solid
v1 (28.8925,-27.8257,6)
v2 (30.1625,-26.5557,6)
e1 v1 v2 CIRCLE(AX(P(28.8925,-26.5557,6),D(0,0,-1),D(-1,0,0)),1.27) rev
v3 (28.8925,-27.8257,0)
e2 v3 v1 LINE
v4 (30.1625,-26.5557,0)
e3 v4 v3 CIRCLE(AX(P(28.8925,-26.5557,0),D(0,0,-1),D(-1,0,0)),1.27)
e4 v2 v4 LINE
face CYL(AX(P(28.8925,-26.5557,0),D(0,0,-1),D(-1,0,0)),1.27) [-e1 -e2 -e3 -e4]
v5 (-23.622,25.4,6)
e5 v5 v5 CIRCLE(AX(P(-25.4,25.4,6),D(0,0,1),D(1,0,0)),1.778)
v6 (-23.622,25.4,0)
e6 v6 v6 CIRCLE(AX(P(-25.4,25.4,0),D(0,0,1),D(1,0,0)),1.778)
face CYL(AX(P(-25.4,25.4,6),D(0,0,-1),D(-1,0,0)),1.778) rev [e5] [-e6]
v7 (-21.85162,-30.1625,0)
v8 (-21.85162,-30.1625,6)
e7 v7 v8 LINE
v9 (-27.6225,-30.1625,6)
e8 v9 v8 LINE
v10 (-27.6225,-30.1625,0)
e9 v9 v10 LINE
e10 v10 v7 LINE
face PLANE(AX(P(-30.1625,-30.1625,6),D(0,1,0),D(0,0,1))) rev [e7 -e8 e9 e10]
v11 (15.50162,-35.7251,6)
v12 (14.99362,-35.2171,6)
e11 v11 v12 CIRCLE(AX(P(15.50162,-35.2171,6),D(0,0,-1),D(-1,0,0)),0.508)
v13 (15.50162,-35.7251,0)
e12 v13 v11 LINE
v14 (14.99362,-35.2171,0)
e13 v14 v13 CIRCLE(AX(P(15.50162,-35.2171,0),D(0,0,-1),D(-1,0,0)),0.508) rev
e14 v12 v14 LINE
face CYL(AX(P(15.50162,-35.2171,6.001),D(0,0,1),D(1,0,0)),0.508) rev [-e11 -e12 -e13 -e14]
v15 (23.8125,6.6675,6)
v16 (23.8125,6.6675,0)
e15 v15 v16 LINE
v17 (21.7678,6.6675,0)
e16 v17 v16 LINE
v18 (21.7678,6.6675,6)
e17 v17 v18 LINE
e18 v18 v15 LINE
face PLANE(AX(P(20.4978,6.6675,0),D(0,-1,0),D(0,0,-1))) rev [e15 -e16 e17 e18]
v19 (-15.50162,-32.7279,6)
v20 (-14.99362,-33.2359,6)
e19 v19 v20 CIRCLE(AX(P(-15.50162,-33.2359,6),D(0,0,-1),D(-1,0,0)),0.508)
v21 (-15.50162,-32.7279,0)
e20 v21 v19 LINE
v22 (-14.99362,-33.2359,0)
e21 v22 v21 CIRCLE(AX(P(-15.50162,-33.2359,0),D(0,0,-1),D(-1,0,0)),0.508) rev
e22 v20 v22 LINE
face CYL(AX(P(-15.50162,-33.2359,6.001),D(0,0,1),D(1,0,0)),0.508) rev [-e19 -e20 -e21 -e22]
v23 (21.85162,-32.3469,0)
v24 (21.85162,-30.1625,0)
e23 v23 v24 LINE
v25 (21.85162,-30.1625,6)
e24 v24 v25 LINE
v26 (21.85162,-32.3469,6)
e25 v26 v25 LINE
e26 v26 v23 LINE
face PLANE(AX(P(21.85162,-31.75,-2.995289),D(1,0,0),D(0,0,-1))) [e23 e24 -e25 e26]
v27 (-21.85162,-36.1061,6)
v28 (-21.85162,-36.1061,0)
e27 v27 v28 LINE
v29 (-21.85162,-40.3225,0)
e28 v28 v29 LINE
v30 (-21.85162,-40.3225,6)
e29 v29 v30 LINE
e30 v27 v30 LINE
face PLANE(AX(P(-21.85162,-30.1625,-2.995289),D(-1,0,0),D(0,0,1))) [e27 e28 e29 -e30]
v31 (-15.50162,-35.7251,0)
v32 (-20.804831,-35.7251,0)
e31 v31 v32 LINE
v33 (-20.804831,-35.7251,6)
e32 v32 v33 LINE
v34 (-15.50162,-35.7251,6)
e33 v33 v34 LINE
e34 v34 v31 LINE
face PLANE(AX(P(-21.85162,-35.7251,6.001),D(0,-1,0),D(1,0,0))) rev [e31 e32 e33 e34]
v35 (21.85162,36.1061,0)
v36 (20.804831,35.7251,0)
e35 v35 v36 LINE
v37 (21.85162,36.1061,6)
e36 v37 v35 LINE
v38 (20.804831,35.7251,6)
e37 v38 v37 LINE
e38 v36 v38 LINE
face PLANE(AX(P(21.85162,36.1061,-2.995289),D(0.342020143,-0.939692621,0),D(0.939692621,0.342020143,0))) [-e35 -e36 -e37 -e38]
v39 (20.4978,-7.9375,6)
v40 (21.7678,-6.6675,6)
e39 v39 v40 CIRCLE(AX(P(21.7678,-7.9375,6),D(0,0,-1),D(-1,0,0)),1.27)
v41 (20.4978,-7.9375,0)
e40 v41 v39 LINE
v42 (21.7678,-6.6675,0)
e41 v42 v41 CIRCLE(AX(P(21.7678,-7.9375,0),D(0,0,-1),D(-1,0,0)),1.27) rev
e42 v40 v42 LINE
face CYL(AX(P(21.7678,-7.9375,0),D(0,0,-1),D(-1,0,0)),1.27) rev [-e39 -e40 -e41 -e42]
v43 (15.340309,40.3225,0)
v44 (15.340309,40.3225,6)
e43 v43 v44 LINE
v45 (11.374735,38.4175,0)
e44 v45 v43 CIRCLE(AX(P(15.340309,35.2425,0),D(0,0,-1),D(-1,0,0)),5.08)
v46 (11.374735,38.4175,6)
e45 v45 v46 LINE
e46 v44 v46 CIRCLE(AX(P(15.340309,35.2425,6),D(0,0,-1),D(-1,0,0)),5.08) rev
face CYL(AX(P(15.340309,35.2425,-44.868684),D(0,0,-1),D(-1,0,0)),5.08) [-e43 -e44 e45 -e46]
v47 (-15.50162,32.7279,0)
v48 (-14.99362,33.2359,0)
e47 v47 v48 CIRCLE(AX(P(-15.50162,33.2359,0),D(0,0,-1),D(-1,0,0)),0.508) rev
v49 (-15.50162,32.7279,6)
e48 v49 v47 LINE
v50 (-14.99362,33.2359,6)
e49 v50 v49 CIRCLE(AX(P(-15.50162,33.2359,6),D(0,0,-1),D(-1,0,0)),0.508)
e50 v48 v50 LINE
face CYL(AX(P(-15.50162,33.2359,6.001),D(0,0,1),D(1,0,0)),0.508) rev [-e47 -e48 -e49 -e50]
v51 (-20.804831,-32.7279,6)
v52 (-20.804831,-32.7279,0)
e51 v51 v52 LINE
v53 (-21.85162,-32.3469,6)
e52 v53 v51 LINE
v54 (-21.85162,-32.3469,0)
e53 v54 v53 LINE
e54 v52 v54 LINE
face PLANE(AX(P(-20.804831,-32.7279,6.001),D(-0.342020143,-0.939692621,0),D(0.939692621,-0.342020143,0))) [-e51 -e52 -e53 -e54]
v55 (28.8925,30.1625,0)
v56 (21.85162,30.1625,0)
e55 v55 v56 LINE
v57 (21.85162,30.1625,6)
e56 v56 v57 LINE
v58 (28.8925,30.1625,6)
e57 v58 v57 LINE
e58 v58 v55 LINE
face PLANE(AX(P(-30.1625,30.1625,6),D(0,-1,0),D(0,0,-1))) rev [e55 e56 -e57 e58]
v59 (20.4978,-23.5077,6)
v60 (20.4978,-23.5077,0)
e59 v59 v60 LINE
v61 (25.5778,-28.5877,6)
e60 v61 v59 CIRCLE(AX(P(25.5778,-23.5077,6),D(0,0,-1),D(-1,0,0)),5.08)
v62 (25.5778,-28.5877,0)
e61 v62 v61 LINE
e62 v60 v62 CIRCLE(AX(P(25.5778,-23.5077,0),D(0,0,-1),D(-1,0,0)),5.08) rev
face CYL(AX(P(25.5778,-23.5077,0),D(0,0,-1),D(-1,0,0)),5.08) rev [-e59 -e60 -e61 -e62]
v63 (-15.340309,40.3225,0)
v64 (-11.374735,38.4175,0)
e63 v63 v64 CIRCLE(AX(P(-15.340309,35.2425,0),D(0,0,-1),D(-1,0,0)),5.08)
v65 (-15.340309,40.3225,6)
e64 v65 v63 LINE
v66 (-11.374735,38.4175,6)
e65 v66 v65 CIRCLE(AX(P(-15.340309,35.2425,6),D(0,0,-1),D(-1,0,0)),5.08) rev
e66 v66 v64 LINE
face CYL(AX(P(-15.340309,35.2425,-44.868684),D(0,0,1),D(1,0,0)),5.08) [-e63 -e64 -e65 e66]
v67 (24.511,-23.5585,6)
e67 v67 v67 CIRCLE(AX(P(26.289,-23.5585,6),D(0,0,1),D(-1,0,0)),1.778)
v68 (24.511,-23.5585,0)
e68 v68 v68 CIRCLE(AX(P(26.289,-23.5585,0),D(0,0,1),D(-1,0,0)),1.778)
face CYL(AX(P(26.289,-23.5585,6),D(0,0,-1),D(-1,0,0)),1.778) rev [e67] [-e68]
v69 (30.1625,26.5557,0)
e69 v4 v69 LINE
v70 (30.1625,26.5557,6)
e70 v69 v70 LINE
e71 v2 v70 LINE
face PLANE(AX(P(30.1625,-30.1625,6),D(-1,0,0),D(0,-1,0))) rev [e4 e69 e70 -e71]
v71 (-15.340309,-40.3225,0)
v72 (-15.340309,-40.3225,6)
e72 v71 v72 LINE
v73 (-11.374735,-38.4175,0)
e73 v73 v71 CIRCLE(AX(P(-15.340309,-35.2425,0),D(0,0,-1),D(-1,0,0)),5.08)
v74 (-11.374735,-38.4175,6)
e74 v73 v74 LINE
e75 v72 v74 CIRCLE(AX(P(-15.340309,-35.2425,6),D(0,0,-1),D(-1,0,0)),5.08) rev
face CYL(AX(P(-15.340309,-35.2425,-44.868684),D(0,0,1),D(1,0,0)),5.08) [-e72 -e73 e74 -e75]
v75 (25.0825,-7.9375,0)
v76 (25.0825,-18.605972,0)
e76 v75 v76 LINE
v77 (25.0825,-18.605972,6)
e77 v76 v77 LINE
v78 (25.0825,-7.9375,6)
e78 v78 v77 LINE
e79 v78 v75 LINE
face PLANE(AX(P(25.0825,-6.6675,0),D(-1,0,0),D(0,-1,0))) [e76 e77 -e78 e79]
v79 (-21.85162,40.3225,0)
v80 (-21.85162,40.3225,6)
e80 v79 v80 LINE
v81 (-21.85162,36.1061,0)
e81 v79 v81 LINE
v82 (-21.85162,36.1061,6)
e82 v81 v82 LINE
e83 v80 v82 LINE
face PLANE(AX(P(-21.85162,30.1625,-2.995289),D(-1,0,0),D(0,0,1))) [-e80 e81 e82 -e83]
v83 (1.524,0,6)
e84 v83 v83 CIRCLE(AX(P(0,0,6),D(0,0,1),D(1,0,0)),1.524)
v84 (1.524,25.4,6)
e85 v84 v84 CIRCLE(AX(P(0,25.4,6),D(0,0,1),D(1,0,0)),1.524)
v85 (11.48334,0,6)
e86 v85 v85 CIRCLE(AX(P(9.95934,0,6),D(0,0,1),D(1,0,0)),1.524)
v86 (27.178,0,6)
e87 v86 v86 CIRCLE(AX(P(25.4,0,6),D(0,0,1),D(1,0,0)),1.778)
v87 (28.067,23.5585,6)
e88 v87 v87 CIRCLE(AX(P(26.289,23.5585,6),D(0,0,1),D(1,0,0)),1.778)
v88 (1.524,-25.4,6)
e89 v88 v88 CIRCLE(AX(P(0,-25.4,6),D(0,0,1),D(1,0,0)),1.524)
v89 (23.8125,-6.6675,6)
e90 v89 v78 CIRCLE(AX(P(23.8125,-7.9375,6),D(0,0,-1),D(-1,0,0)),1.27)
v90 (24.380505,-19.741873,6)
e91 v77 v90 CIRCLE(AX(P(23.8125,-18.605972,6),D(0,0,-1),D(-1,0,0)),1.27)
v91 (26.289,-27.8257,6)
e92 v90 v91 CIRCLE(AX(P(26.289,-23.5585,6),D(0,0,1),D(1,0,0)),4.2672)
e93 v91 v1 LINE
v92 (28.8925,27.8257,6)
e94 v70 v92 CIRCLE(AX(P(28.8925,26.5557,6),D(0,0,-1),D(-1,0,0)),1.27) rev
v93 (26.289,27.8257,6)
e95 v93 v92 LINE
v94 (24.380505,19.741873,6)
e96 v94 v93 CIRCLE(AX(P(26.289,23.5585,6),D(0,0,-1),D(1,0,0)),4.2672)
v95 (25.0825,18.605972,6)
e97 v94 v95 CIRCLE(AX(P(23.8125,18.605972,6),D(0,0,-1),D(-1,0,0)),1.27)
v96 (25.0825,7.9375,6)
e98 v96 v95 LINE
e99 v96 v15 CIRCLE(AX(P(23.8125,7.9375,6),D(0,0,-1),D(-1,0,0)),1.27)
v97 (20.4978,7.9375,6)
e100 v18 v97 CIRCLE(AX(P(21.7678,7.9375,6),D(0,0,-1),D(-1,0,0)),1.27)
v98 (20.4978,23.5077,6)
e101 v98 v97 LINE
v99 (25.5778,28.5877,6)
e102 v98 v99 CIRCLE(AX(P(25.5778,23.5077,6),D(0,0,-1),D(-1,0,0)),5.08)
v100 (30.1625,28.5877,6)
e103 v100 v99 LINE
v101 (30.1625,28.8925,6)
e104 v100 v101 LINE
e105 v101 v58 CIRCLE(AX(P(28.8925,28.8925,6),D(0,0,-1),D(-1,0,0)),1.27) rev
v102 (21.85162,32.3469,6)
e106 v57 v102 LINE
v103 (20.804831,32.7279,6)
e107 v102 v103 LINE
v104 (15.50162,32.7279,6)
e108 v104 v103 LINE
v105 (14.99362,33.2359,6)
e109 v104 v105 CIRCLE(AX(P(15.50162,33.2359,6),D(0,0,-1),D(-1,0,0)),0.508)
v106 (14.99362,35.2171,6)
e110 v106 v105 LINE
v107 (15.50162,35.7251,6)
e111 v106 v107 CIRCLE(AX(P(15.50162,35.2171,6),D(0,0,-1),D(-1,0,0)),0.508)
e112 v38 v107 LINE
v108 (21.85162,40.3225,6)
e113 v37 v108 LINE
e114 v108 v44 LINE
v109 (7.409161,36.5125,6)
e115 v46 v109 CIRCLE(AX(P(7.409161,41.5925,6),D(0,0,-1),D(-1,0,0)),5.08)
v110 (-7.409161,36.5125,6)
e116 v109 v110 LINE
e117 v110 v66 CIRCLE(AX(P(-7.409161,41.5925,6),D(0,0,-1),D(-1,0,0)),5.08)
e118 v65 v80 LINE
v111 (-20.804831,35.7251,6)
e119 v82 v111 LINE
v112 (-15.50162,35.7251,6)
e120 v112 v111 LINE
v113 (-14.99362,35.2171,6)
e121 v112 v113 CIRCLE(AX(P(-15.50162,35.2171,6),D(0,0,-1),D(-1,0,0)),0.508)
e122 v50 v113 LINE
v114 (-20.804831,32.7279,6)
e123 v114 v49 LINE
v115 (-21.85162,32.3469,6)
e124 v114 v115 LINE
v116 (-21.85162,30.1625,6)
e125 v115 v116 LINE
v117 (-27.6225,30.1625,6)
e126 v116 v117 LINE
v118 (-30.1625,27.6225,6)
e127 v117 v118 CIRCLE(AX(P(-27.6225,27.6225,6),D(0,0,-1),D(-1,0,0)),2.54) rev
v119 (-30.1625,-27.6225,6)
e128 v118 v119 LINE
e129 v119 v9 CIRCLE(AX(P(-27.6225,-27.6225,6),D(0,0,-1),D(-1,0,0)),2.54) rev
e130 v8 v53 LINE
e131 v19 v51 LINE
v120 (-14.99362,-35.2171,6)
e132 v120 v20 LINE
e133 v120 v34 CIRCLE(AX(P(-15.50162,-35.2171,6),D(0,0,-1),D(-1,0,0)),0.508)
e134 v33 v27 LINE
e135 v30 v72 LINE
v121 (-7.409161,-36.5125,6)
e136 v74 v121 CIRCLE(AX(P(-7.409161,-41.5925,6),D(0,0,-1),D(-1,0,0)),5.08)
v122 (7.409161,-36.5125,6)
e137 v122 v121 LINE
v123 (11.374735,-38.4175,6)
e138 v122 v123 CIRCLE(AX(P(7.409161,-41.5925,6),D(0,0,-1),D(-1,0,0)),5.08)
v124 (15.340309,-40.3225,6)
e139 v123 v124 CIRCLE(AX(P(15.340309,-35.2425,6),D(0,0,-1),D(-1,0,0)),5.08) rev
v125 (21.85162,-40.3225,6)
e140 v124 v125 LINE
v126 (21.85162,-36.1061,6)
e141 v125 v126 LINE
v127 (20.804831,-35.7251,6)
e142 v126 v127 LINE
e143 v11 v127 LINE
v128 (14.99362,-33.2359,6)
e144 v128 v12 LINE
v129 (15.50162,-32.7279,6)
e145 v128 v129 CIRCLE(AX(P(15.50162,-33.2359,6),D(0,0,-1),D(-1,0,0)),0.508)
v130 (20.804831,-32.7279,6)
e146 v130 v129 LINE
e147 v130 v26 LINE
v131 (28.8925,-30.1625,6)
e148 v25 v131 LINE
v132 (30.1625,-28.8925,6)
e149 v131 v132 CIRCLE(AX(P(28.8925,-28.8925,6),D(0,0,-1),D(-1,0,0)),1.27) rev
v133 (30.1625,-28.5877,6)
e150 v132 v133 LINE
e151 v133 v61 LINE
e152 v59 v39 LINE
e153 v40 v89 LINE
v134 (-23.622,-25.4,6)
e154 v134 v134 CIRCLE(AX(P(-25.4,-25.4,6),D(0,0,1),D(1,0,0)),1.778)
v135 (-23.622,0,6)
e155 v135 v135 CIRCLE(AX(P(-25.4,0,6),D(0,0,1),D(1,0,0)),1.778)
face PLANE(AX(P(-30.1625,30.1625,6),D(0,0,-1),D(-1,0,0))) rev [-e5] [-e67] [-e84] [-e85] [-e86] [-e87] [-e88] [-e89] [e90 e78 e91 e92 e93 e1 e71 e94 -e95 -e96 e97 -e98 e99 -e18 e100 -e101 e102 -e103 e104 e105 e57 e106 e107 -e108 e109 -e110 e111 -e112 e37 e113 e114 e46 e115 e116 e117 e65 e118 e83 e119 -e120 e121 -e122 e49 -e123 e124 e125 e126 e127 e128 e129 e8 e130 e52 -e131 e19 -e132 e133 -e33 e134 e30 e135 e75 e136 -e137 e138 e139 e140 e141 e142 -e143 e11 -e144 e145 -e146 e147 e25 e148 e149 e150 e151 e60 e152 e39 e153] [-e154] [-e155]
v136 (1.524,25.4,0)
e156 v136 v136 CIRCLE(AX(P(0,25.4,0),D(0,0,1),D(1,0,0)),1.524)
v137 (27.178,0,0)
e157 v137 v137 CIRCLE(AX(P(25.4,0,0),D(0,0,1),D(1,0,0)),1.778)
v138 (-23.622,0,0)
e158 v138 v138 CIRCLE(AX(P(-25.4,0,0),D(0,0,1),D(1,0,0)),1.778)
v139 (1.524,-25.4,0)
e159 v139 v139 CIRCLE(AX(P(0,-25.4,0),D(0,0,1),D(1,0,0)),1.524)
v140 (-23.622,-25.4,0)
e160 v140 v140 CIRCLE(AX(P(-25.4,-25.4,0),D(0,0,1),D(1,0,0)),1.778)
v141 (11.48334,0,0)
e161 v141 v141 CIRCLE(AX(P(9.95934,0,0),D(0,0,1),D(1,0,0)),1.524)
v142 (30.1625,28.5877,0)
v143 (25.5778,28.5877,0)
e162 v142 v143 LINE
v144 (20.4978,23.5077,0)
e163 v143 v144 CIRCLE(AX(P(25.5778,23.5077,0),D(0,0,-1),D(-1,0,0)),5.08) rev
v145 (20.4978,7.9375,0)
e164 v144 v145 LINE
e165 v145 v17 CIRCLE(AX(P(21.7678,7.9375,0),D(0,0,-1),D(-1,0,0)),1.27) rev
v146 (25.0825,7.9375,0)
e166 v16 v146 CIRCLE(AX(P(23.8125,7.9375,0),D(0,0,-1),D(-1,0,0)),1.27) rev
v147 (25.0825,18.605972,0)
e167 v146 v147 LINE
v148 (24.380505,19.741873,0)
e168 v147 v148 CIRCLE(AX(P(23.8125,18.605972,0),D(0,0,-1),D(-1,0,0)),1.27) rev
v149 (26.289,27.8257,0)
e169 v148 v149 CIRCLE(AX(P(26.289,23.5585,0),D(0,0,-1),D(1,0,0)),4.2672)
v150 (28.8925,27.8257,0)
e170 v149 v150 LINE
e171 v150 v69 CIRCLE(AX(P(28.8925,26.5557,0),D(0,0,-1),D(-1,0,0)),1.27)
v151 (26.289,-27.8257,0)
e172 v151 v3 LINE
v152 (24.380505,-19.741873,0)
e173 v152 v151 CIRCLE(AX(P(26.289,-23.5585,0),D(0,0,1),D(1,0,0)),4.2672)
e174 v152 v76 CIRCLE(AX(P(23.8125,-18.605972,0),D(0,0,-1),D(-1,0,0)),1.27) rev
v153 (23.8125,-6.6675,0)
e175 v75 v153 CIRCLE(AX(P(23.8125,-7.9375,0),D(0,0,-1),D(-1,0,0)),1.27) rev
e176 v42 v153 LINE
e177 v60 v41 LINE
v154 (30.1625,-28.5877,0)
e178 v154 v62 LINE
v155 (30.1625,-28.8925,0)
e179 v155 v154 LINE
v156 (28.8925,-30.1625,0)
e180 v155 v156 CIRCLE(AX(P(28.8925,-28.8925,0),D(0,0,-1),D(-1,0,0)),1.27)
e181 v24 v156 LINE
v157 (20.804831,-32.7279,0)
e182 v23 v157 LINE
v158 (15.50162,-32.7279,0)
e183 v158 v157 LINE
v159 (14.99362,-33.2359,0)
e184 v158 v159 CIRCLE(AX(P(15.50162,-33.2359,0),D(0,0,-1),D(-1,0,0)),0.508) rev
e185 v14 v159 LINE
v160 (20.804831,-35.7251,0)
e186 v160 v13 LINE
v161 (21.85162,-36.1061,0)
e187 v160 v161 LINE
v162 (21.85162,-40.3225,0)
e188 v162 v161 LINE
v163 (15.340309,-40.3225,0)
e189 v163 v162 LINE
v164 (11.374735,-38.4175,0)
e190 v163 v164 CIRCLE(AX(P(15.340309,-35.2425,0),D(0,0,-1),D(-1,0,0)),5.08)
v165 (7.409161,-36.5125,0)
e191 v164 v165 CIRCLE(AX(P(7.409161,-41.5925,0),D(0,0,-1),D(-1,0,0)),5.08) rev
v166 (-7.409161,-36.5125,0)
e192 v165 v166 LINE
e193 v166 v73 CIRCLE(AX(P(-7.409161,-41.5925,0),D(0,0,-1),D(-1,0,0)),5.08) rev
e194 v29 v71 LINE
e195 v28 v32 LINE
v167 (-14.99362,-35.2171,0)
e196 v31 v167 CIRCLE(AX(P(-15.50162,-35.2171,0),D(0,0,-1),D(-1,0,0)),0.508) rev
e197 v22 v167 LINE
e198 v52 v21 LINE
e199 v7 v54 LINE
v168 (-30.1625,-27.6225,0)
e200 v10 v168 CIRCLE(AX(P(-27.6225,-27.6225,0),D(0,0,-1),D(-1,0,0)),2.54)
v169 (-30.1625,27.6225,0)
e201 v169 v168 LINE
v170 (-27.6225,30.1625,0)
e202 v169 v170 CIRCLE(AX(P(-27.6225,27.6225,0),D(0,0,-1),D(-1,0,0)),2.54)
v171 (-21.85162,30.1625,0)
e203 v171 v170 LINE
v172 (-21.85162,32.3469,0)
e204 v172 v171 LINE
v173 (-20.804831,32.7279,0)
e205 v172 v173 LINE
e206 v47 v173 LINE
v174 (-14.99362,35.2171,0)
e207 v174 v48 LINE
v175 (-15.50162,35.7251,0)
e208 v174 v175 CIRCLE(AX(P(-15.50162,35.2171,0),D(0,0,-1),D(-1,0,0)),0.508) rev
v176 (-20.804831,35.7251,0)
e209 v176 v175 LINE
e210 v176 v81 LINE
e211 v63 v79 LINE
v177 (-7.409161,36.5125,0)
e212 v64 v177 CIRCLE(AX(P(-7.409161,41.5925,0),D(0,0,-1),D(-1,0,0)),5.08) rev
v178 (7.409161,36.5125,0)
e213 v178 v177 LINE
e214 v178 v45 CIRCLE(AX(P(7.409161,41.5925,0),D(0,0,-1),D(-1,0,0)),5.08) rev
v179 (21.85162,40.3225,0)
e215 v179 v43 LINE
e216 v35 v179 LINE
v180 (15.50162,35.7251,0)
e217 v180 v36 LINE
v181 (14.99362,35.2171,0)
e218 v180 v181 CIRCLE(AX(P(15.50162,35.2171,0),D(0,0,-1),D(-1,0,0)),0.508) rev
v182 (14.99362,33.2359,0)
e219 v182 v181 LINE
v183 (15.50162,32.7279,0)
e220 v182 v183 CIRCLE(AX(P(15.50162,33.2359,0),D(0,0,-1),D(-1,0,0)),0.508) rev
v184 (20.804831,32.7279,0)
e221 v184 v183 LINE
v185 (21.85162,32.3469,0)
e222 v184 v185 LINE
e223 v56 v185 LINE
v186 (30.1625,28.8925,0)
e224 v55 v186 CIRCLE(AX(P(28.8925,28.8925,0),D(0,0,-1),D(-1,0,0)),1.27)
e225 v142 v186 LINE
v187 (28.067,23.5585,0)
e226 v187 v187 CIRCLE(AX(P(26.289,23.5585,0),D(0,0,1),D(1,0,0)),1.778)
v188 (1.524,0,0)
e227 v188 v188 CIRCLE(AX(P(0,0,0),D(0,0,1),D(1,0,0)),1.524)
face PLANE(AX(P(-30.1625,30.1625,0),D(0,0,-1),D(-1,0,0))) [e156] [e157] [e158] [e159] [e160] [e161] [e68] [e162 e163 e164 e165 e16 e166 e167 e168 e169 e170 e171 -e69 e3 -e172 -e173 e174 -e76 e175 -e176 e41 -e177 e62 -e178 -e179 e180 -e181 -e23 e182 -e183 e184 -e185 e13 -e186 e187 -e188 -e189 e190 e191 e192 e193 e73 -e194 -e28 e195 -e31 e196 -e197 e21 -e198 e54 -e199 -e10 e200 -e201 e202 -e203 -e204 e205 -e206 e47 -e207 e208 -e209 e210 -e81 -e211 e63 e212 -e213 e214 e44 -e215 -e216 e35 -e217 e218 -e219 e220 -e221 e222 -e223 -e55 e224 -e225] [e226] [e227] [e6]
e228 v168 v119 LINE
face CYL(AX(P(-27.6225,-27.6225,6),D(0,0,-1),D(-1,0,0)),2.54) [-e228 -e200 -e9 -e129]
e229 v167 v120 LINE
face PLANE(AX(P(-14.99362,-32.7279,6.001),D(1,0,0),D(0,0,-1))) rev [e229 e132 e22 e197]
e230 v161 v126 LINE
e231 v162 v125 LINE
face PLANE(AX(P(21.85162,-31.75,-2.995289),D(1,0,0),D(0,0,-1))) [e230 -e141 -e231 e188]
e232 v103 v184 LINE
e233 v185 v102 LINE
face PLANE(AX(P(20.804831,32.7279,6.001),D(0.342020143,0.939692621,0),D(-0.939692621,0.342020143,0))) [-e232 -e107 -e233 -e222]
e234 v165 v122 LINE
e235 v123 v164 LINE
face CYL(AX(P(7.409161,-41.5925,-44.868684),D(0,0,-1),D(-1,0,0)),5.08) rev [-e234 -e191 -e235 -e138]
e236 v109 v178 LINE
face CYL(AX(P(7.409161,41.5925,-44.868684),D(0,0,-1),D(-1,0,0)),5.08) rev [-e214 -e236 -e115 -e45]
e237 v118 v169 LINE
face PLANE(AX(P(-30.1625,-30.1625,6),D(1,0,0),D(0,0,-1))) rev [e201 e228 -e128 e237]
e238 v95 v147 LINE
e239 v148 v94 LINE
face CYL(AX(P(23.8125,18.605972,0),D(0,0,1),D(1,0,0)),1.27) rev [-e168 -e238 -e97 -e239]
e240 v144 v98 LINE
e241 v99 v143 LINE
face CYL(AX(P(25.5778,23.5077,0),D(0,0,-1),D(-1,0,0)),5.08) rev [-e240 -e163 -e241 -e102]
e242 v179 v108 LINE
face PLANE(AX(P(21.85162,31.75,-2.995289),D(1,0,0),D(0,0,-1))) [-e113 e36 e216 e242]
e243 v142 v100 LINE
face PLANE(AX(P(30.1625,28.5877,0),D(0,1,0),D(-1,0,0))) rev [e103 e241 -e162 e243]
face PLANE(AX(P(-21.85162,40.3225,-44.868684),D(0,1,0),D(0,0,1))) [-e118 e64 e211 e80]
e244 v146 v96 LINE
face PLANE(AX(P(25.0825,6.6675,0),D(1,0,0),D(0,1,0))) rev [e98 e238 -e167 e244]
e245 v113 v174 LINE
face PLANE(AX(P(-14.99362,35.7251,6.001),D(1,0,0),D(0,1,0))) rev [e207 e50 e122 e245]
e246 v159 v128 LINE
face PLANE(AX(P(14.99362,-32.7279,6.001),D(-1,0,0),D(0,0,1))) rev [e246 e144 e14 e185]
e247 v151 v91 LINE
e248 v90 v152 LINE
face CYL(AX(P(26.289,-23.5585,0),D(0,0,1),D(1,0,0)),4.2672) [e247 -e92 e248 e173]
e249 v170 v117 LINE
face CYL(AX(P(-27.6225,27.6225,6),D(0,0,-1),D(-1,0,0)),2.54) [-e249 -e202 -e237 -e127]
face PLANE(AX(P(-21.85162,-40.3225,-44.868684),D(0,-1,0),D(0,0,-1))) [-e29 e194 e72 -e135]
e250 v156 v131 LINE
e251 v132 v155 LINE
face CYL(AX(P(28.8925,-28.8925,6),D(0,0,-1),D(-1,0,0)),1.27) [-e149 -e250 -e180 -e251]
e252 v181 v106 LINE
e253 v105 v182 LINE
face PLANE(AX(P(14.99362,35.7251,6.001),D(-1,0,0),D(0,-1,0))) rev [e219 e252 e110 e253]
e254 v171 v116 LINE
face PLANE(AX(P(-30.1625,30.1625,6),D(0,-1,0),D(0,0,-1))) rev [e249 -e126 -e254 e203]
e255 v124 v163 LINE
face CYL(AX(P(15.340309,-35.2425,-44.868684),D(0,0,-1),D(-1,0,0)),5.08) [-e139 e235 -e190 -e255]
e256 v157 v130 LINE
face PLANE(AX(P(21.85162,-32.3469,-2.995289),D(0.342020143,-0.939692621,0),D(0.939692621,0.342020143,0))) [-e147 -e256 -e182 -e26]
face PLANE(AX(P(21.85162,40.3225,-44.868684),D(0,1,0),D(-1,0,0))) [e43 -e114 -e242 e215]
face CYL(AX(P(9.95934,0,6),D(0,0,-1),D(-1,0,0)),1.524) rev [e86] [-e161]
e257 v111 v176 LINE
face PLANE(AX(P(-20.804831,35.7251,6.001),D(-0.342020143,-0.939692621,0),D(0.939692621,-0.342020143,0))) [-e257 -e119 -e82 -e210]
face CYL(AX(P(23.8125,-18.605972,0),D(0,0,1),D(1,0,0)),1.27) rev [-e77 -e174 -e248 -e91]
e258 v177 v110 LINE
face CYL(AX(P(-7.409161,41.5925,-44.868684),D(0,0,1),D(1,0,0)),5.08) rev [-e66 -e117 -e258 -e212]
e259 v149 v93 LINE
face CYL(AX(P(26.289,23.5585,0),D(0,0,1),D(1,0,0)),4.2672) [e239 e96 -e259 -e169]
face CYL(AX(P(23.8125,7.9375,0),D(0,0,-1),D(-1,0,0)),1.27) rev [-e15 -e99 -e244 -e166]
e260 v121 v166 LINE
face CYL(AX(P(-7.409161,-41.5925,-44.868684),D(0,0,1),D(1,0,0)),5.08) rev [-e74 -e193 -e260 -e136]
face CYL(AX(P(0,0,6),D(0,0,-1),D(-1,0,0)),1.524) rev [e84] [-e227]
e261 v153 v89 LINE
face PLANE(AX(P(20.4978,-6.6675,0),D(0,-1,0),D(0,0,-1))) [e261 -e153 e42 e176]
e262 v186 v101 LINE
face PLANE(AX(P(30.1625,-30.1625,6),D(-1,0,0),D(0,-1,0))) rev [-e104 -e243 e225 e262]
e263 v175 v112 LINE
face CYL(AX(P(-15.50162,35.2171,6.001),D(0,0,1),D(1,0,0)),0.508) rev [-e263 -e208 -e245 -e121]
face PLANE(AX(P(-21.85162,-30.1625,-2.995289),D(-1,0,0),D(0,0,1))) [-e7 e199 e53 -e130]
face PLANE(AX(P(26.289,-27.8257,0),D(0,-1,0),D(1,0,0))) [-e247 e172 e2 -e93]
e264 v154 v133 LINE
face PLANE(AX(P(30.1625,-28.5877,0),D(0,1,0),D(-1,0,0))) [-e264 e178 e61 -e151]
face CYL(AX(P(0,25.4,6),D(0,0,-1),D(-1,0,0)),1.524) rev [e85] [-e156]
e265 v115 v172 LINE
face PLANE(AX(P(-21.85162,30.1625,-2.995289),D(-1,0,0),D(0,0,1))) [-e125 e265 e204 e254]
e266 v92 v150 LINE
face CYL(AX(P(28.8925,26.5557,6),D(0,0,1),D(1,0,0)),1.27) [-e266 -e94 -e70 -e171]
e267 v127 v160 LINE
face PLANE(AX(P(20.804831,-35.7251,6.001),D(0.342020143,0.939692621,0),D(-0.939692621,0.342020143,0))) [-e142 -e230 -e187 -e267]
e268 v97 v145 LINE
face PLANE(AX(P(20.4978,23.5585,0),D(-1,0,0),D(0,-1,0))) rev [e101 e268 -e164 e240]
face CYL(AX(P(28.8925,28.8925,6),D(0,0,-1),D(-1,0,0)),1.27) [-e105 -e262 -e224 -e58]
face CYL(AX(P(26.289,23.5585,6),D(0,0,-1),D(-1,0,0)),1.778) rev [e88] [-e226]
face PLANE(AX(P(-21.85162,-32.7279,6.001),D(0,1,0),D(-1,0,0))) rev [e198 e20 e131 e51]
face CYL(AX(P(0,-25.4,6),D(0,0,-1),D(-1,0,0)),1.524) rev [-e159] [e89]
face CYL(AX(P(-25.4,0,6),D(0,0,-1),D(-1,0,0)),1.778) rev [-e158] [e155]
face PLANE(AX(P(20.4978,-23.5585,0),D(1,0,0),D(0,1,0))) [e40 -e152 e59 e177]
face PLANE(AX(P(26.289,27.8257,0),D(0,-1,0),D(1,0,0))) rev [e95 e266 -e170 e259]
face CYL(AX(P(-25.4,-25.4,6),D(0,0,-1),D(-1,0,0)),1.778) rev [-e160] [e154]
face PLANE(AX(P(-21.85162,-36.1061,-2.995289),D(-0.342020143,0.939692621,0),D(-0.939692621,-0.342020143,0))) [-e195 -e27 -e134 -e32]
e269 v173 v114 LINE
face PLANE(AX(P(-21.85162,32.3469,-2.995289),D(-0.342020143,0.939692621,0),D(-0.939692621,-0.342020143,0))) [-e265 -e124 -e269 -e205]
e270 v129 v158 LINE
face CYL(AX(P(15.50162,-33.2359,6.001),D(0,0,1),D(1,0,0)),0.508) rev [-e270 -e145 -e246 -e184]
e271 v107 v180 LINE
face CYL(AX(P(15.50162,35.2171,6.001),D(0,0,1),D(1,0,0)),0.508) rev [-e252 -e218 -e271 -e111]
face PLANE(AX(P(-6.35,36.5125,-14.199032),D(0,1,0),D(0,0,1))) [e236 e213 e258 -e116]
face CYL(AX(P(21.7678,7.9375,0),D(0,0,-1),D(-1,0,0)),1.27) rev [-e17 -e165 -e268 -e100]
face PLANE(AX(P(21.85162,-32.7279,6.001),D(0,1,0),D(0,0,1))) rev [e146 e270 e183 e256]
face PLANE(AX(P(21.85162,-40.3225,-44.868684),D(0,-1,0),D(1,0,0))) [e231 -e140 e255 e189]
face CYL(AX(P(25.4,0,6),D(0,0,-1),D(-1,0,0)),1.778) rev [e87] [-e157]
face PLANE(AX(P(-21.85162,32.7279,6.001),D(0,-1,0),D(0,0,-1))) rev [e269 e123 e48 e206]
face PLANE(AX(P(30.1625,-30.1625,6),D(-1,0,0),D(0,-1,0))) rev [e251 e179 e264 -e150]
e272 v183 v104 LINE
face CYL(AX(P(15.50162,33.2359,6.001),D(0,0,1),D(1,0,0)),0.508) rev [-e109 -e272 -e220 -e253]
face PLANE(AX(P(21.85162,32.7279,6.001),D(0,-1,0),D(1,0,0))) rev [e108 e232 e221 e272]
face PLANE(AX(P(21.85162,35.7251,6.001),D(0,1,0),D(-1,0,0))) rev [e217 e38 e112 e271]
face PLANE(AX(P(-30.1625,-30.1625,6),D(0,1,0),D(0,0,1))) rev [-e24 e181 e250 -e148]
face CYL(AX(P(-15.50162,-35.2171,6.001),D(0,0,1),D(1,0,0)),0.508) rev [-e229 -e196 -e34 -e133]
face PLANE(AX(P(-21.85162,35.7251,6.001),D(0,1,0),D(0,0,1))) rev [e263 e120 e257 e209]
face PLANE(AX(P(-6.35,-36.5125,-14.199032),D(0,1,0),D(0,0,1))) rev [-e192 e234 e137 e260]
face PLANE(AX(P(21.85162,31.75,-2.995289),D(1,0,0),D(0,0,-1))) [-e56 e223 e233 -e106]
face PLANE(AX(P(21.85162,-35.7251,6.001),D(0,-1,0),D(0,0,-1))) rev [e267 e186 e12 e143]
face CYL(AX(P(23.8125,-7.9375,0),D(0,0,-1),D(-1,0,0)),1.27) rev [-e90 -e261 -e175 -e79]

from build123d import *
from OCP.BRepFilletAPI import BRepFilletAPI_MakeChamfer

# Parameters (mm, degrees)
SKETCH1_W           = 60.325
SKETCH1_H           = 60.325
SKETCH1_R           = 1.778
SKETCH1_R_2         = 1.524
BOSS_EXTRUDE1_DEPTH = 6
CUT_EXTRUDE1_DEPTH  = 44.076128105
FILLET7_R           = 1.27
FILLET8_R           = 1.27
FILLET9_R           = 2.54
FILLET15_R          = 5.08
SKETCH4_W           = 2.54
SKETCH4_H           = 1.5875
BOSS_EXTRUDE2_DEPTH = 6
SKETCH6_W           = 12.7
SKETCH6_H           = 6.35
BOSS_EXTRUDE3_DEPTH = 6
FILLET10_R          = 2.54
FILLET11_R          = 2.54
BOSS_EXTRUDE4_DEPTH = 6
FILLET12_R          = 5.08
FILLET13_R          = 5.08
CUT_EXTRUDE2_REACH  = 52.712
SKETCH9_W           = 6.858
SKETCH9_H           = 2.9972
CHAMFER1_SIZE       = 0.381
CHAMFER1_SIZE2      = 1.046788897
FILLET14_R          = 0.508


with BuildPart() as part:
    # Sketch1 → Boss-Extrude1 (new body)
    with BuildSketch(Plane.XY):
        Rectangle(SKETCH1_W, SKETCH1_H)
        with Locations((26.289, 23.5585)):
            Circle(SKETCH1_R, mode=Mode.SUBTRACT)
        with Locations(Location((26.289, -23.5585, 0), (0, 0, 180))):
            Circle(SKETCH1_R, mode=Mode.SUBTRACT)
        with Locations((-25.4, 25.4)):
            Circle(SKETCH1_R, mode=Mode.SUBTRACT)
        with Locations((-25.4, -25.4)):
            Circle(SKETCH1_R, mode=Mode.SUBTRACT)
        with Locations((0, 25.4)):
            Circle(SKETCH1_R_2, mode=Mode.SUBTRACT)
        Circle(SKETCH1_R_2, mode=Mode.SUBTRACT)
        with Locations((0, -25.4)):
            Circle(SKETCH1_R_2, mode=Mode.SUBTRACT)
        with Locations((-25.4, 0)):
            Circle(SKETCH1_R, mode=Mode.SUBTRACT)
        with Locations((9.95934, 0)):
            Circle(SKETCH1_R_2, mode=Mode.SUBTRACT)
        with Locations((25.4, 0)):
            Circle(SKETCH1_R, mode=Mode.SUBTRACT)
    extrude(amount=BOSS_EXTRUDE1_DEPTH)

    # Sketch5 → Cut-Extrude1 (cut, through all)
    with BuildSketch(Plane.XY.offset(6)):
        with BuildLine():
            Line((20.4978, 23.5585), (20.4978, 6.6675))
            Line((20.4978, 6.6675), (25.0825, 6.6675))
            Line((25.0825, 6.6675), (25.0825, 19.465413928))
            ThreePointArc((25.0825, 19.465413928), (22.065552787, 24.167999366), (26.289, 27.8257))
            Line((26.289, 27.8257), (30.1625, 27.8257))
            Line((30.1625, 27.8257), (30.1625, 28.5877))
            Line((30.1625, 28.5877), (23.417563983, 28.5877))
            ThreePointArc((23.417563983, 28.5877), (21.28065408, 26.46615689), (20.4978, 23.5585))
        make_face()
    cut_extrude1 = extrude(amount=-CUT_EXTRUDE1_DEPTH, mode=Mode.SUBTRACT)

    # Fillet7
    fillet7_edges = [part.edges().sort_by_distance(p)[0] for p in [
        (30.1625, 27.8257, 3),
        (25.0825, 19.465413928, 3),
        (25.0825, 6.6675, 3),
        (20.4978, 6.6675, 3),
        (30.1625, 30.1625, 3),
    ]]
    fillet(fillet7_edges, radius=FILLET7_R)

    # Mirror1: Cut-Extrude1 across plane
    add(cut_extrude1.mirror(Plane.ZX), mode=Mode.SUBTRACT)

    # Fillet8
    fillet8_edges = [part.edges().sort_by_distance(p)[0] for p in [
        (20.4978, -6.6675, 3),
        (25.0825, -6.6675, 3),
        (25.0825, -19.465413928, 3),
        (30.1625, -27.8257, 3),
        (30.1625, -30.1625, 3),
    ]]
    fillet(fillet8_edges, radius=FILLET8_R)

    # Fillet9
    fillet9_edges = [part.edges().sort_by_distance(p)[0] for p in [
        (-30.1625, 30.1625, 3),
        (-30.1625, -30.1625, 3),
    ]]
    fillet(fillet9_edges, radius=FILLET9_R)

    # Fillet15
    fillet15_edges = [part.edges().sort_by_distance(p)[0] for p in [
        (23.417563983, -28.5877, 3),
        (23.417563983, 28.5877, 3),
    ]]
    fillet(fillet15_edges, radius=FILLET15_R)

    # Sketch4 → Boss-Extrude2 (add)
    with BuildSketch(Plane.XY.offset(6)):
        with Locations((20.58162, 30.95625)):
            Rectangle(SKETCH4_W, SKETCH4_H)
        with Locations((20.58162, -30.95625)):
            Rectangle(SKETCH4_W, SKETCH4_H)
        with Locations((-20.58162, 30.95625)):
            Rectangle(SKETCH4_W, SKETCH4_H)
        with Locations((-20.58162, -30.95625)):
            Rectangle(SKETCH4_W, SKETCH4_H)
    extrude(amount=-BOSS_EXTRUDE2_DEPTH)

    # Sketch6 → Boss-Extrude3 (add)
    with BuildSketch(Plane.XY.offset(6)):
        with Locations((0, 33.3375)):
            Rectangle(SKETCH6_W, SKETCH6_H)
    boss_extrude3 = extrude(amount=-BOSS_EXTRUDE3_DEPTH)

    # Fillet10
    fillet10_edges = [part.edges().sort_by_distance(p)[0] for p in [
        (6.35, 30.1625, 3),
        (6.35, 36.5125, 3),
        (-6.35, 36.5125, 3),
        (-6.35, 30.1625, 3),
    ]]
    fillet(fillet10_edges, radius=FILLET10_R)

    # Mirror2: Boss-Extrude3 across plane
    add(boss_extrude3.mirror(Plane.ZX))

    # Fillet11
    fillet11_edges = [part.edges().sort_by_distance(p)[0] for p in [
        (-6.35, -36.5125, 3),
        (-6.35, -30.1625, 3),
        (6.35, -30.1625, 3),
        (6.35, -36.5125, 3),
    ]]
    fillet(fillet11_edges, radius=FILLET11_R)

    # Sketch7 → Boss-Extrude4 (add)
    with BuildSketch(Plane.XY.offset(6)):
        Polygon((-21.85162, 30.1625), (21.85162, 30.1625), (21.85162, 36.5125), (21.85162, 40.3225), (10.42162, 40.3225), (10.42162, 36.5125), (-10.42162, 36.5125), (-10.42162, 40.3225), (-21.85162, 40.3225), (-21.85162, 36.5125), align=None)
        Polygon((-21.85162, -30.1625), (21.85162, -30.1625), (21.85162, -36.5125), (21.85162, -40.3225), (10.42162, -40.3225), (10.42162, -36.5125), (-10.42162, -36.5125), (-10.42162, -40.3225), (-21.85162, -40.3225), (-21.85162, -36.5125), align=None)
    extrude(amount=-BOSS_EXTRUDE4_DEPTH)

    # Fillet12
    # the kernel refuses this fillet: 5.08 mm, written as the material it takes off along each edge
    with BuildSketch(Plane(origin=(-10.42162, -40.3225, 18.296722124), x_dir=(0, 1, 0), z_dir=(0, 0, -1)), Plane(origin=(10.42162, 40.3225, 18.296722124), x_dir=(0, -1, 0), z_dir=(0, 0, -1))) as fillet12_piece_1:
        with BuildLine():
            CenterArc((5.08, -4.91868885), FILLET12_R, 104.477512186, 75.522487814)
            Line((0, -4.91868885), (-0.1016, -4.91868885))
            Line((-0.1016, -4.91868885), (-0.1016, 0))
            Line((-0.1016, 0), (0, 0.1016))
            ThreePointArc((0, 0.1016), (1.905, 0.1016), (3.7846, 0.098373777))
            Line((3.7846, 0.098373777), (3.81, 0))
        make_face()
    extrude(amount=30.593444248, mode=Mode.SUBTRACT)
    with BuildSketch(Plane(origin=(10.42162, -40.3225, 18.296722124), x_dir=(1, 0, 0), z_dir=(0, 0, -1)), Plane(origin=(-10.42162, 40.3225, 18.296722124), x_dir=(-1, 0, 0), z_dir=(0, 0, -1))) as fillet12_piece_2:
        with BuildLine():
            CenterArc((4.91868885, -5.08), FILLET12_R, 90, 75.522487814)
            Line((0, -3.81), (-0.098373777, -3.7846))
            ThreePointArc((-0.098373777, -3.7846), (-0.1016, -1.905), (-0.1016, 0))
            Line((-0.1016, 0), (0, 0.1016))
            Line((0, 0.1016), (4.91868885, 0.1016))
            Line((4.91868885, 0.1016), (4.91868885, 0))
        make_face()
    extrude(amount=30.593444248, mode=Mode.SUBTRACT)

    # Fillet13
    fillet13_edges = [part.edges().sort_by_distance(p)[0] for p in [
        (10.42162, 36.5125, 3),
        (-10.42162, 36.5125, 3),
        (-10.42162, -36.5125, 3),
        (10.42162, -36.5125, 3),
    ]]
    fillet(fillet13_edges, radius=FILLET13_R)

    # Sketch9 → Cut-Extrude2 (cut, up to next)
    with BuildSketch(Plane(origin=(0, 0, 0), x_dir=(-1, 0, 0), z_dir=(0, 0, -1)), mode=Mode.PRIVATE) as cut_extrude2_sk1:
        with Locations((-18.42262, 34.2265)):
            Rectangle(SKETCH9_W, SKETCH9_H)
    cut_extrude2_tool1 = extrude(cut_extrude2_sk1.sketch, amount=-CUT_EXTRUDE2_REACH, mode=Mode.PRIVATE) & part.part
    # Sketch9 → Cut-Extrude2 (cut, up to next)
    with BuildSketch(Plane(origin=(0, 0, 0), x_dir=(-1, 0, 0), z_dir=(0, 0, -1)), mode=Mode.PRIVATE) as cut_extrude2_sk2:
        with Locations((18.42262, 34.2265)):
            Rectangle(SKETCH9_W, SKETCH9_H)
    cut_extrude2_tool2 = extrude(cut_extrude2_sk2.sketch, amount=-CUT_EXTRUDE2_REACH, mode=Mode.PRIVATE) & part.part
    # Sketch9 → Cut-Extrude2 (cut, up to next)
    with BuildSketch(Plane(origin=(0, 0, 0), x_dir=(-1, 0, 0), z_dir=(0, 0, -1)), mode=Mode.PRIVATE) as cut_extrude2_sk3:
        with Locations((-18.42262, -34.2265)):
            Rectangle(SKETCH9_W, SKETCH9_H)
    cut_extrude2_tool3 = extrude(cut_extrude2_sk3.sketch, amount=-CUT_EXTRUDE2_REACH, mode=Mode.PRIVATE) & part.part
    # Sketch9 → Cut-Extrude2 (cut, up to next)
    with BuildSketch(Plane(origin=(0, 0, 0), x_dir=(-1, 0, 0), z_dir=(0, 0, -1)), mode=Mode.PRIVATE) as cut_extrude2_sk4:
        with Locations((18.42262, -34.2265)):
            Rectangle(SKETCH9_W, SKETCH9_H)
    cut_extrude2_tool4 = extrude(cut_extrude2_sk4.sketch, amount=-CUT_EXTRUDE2_REACH, mode=Mode.PRIVATE) & part.part
    add(cut_extrude2_tool1.solids().sort_by_distance((18.42262, 34.2265, 0))[0], mode=Mode.SUBTRACT)
    add(cut_extrude2_tool2.solids().sort_by_distance((-18.42262, 34.2265, 0))[0], mode=Mode.SUBTRACT)
    add(cut_extrude2_tool3.solids().sort_by_distance((18.42262, -34.2265, 0))[0], mode=Mode.SUBTRACT)
    add(cut_extrude2_tool4.solids().sort_by_distance((-18.42262, -34.2265, 0))[0], mode=Mode.SUBTRACT)

    # Chamfer1: one chamfer whose edges measure the first distance from different faces: ONE call of the kernel's chamfer builder (chamfer() names one face for all edges)
    chamfer1_edges_1 = [part.edges().sort_by_distance(p)[0] for p in [
        (21.85162, 32.7279, 3),
    ]]
    chamfer1_side_1 = [part.faces().sort_by_distance(p)[0] for p in [
        (21.85162, 31.4452, 3),
    ]]
    chamfer1_edges_2 = [part.edges().sort_by_distance(p)[0] for p in [
        (21.85162, 35.7251, 3),
    ]]
    chamfer1_side_2 = [part.faces().sort_by_distance(p)[0] for p in [
        (21.85162, 38.0238, 3),
    ]]
    chamfer1_edges_3 = [part.edges().sort_by_distance(p)[0] for p in [
        (-21.85162, 35.7251, 3),
    ]]
    chamfer1_side_3 = [part.faces().sort_by_distance(p)[0] for p in [
        (-21.85162, 38.0238, 3),
    ]]
    chamfer1_edges_4 = [part.edges().sort_by_distance(p)[0] for p in [
        (-21.85162, 32.7279, 3),
    ]]
    chamfer1_side_4 = [part.faces().sort_by_distance(p)[0] for p in [
        (-21.85162, 31.4452, 3),
    ]]
    chamfer1_edges_5 = [part.edges().sort_by_distance(p)[0] for p in [
        (21.85162, -35.7251, 3),
    ]]
    chamfer1_side_5 = [part.faces().sort_by_distance(p)[0] for p in [
        (21.85162, -38.0238, 3),
    ]]
    chamfer1_edges_6 = [part.edges().sort_by_distance(p)[0] for p in [
        (21.85162, -32.7279, 3),
    ]]
    chamfer1_side_6 = [part.faces().sort_by_distance(p)[0] for p in [
        (21.85162, -31.4452, 3),
    ]]
    chamfer1_edges_7 = [part.edges().sort_by_distance(p)[0] for p in [
        (-21.85162, -32.7279, 3),
    ]]
    chamfer1_side_7 = [part.faces().sort_by_distance(p)[0] for p in [
        (-21.85162, -31.4452, 3),
    ]]
    chamfer1_edges_8 = [part.edges().sort_by_distance(p)[0] for p in [
        (-21.85162, -35.7251, 3),
    ]]
    chamfer1_side_8 = [part.faces().sort_by_distance(p)[0] for p in [
        (-21.85162, -38.0238, 3),
    ]]
    chamfer1 = BRepFilletAPI_MakeChamfer(part.part.solid().wrapped)
    for e in chamfer1_edges_1:
        chamfer1.Add(CHAMFER1_SIZE, CHAMFER1_SIZE2, e.wrapped, chamfer1_side_1[0].wrapped)  # the first distance lies on this face
    for e in chamfer1_edges_2:
        chamfer1.Add(CHAMFER1_SIZE, CHAMFER1_SIZE2, e.wrapped, chamfer1_side_2[0].wrapped)  # the first distance lies on this face
    for e in chamfer1_edges_3:
        chamfer1.Add(CHAMFER1_SIZE, CHAMFER1_SIZE2, e.wrapped, chamfer1_side_3[0].wrapped)  # the first distance lies on this face
    for e in chamfer1_edges_4:
        chamfer1.Add(CHAMFER1_SIZE, CHAMFER1_SIZE2, e.wrapped, chamfer1_side_4[0].wrapped)  # the first distance lies on this face
    for e in chamfer1_edges_5:
        chamfer1.Add(CHAMFER1_SIZE, CHAMFER1_SIZE2, e.wrapped, chamfer1_side_5[0].wrapped)  # the first distance lies on this face
    for e in chamfer1_edges_6:
        chamfer1.Add(CHAMFER1_SIZE, CHAMFER1_SIZE2, e.wrapped, chamfer1_side_6[0].wrapped)  # the first distance lies on this face
    for e in chamfer1_edges_7:
        chamfer1.Add(CHAMFER1_SIZE, CHAMFER1_SIZE2, e.wrapped, chamfer1_side_7[0].wrapped)  # the first distance lies on this face
    for e in chamfer1_edges_8:
        chamfer1.Add(CHAMFER1_SIZE, CHAMFER1_SIZE2, e.wrapped, chamfer1_side_8[0].wrapped)  # the first distance lies on this face
    add(Compound.cast(chamfer1.Shape()), mode=Mode.REPLACE)

    # Fillet14
    fillet14_edges = [part.edges().sort_by_distance(p)[0] for p in [
        (14.99362, 35.7251, 3),
        (14.99362, 32.7279, 3),
        (-14.99362, 32.7279, 3),
        (-14.99362, 35.7251, 3),
        (14.99362, -32.7279, 3),
        (14.99362, -35.7251, 3),
        (-14.99362, -35.7251, 3),
        (-14.99362, -32.7279, 3),
    ]]
    fillet(fillet14_edges, radius=FILLET14_R)


solid = part.part
